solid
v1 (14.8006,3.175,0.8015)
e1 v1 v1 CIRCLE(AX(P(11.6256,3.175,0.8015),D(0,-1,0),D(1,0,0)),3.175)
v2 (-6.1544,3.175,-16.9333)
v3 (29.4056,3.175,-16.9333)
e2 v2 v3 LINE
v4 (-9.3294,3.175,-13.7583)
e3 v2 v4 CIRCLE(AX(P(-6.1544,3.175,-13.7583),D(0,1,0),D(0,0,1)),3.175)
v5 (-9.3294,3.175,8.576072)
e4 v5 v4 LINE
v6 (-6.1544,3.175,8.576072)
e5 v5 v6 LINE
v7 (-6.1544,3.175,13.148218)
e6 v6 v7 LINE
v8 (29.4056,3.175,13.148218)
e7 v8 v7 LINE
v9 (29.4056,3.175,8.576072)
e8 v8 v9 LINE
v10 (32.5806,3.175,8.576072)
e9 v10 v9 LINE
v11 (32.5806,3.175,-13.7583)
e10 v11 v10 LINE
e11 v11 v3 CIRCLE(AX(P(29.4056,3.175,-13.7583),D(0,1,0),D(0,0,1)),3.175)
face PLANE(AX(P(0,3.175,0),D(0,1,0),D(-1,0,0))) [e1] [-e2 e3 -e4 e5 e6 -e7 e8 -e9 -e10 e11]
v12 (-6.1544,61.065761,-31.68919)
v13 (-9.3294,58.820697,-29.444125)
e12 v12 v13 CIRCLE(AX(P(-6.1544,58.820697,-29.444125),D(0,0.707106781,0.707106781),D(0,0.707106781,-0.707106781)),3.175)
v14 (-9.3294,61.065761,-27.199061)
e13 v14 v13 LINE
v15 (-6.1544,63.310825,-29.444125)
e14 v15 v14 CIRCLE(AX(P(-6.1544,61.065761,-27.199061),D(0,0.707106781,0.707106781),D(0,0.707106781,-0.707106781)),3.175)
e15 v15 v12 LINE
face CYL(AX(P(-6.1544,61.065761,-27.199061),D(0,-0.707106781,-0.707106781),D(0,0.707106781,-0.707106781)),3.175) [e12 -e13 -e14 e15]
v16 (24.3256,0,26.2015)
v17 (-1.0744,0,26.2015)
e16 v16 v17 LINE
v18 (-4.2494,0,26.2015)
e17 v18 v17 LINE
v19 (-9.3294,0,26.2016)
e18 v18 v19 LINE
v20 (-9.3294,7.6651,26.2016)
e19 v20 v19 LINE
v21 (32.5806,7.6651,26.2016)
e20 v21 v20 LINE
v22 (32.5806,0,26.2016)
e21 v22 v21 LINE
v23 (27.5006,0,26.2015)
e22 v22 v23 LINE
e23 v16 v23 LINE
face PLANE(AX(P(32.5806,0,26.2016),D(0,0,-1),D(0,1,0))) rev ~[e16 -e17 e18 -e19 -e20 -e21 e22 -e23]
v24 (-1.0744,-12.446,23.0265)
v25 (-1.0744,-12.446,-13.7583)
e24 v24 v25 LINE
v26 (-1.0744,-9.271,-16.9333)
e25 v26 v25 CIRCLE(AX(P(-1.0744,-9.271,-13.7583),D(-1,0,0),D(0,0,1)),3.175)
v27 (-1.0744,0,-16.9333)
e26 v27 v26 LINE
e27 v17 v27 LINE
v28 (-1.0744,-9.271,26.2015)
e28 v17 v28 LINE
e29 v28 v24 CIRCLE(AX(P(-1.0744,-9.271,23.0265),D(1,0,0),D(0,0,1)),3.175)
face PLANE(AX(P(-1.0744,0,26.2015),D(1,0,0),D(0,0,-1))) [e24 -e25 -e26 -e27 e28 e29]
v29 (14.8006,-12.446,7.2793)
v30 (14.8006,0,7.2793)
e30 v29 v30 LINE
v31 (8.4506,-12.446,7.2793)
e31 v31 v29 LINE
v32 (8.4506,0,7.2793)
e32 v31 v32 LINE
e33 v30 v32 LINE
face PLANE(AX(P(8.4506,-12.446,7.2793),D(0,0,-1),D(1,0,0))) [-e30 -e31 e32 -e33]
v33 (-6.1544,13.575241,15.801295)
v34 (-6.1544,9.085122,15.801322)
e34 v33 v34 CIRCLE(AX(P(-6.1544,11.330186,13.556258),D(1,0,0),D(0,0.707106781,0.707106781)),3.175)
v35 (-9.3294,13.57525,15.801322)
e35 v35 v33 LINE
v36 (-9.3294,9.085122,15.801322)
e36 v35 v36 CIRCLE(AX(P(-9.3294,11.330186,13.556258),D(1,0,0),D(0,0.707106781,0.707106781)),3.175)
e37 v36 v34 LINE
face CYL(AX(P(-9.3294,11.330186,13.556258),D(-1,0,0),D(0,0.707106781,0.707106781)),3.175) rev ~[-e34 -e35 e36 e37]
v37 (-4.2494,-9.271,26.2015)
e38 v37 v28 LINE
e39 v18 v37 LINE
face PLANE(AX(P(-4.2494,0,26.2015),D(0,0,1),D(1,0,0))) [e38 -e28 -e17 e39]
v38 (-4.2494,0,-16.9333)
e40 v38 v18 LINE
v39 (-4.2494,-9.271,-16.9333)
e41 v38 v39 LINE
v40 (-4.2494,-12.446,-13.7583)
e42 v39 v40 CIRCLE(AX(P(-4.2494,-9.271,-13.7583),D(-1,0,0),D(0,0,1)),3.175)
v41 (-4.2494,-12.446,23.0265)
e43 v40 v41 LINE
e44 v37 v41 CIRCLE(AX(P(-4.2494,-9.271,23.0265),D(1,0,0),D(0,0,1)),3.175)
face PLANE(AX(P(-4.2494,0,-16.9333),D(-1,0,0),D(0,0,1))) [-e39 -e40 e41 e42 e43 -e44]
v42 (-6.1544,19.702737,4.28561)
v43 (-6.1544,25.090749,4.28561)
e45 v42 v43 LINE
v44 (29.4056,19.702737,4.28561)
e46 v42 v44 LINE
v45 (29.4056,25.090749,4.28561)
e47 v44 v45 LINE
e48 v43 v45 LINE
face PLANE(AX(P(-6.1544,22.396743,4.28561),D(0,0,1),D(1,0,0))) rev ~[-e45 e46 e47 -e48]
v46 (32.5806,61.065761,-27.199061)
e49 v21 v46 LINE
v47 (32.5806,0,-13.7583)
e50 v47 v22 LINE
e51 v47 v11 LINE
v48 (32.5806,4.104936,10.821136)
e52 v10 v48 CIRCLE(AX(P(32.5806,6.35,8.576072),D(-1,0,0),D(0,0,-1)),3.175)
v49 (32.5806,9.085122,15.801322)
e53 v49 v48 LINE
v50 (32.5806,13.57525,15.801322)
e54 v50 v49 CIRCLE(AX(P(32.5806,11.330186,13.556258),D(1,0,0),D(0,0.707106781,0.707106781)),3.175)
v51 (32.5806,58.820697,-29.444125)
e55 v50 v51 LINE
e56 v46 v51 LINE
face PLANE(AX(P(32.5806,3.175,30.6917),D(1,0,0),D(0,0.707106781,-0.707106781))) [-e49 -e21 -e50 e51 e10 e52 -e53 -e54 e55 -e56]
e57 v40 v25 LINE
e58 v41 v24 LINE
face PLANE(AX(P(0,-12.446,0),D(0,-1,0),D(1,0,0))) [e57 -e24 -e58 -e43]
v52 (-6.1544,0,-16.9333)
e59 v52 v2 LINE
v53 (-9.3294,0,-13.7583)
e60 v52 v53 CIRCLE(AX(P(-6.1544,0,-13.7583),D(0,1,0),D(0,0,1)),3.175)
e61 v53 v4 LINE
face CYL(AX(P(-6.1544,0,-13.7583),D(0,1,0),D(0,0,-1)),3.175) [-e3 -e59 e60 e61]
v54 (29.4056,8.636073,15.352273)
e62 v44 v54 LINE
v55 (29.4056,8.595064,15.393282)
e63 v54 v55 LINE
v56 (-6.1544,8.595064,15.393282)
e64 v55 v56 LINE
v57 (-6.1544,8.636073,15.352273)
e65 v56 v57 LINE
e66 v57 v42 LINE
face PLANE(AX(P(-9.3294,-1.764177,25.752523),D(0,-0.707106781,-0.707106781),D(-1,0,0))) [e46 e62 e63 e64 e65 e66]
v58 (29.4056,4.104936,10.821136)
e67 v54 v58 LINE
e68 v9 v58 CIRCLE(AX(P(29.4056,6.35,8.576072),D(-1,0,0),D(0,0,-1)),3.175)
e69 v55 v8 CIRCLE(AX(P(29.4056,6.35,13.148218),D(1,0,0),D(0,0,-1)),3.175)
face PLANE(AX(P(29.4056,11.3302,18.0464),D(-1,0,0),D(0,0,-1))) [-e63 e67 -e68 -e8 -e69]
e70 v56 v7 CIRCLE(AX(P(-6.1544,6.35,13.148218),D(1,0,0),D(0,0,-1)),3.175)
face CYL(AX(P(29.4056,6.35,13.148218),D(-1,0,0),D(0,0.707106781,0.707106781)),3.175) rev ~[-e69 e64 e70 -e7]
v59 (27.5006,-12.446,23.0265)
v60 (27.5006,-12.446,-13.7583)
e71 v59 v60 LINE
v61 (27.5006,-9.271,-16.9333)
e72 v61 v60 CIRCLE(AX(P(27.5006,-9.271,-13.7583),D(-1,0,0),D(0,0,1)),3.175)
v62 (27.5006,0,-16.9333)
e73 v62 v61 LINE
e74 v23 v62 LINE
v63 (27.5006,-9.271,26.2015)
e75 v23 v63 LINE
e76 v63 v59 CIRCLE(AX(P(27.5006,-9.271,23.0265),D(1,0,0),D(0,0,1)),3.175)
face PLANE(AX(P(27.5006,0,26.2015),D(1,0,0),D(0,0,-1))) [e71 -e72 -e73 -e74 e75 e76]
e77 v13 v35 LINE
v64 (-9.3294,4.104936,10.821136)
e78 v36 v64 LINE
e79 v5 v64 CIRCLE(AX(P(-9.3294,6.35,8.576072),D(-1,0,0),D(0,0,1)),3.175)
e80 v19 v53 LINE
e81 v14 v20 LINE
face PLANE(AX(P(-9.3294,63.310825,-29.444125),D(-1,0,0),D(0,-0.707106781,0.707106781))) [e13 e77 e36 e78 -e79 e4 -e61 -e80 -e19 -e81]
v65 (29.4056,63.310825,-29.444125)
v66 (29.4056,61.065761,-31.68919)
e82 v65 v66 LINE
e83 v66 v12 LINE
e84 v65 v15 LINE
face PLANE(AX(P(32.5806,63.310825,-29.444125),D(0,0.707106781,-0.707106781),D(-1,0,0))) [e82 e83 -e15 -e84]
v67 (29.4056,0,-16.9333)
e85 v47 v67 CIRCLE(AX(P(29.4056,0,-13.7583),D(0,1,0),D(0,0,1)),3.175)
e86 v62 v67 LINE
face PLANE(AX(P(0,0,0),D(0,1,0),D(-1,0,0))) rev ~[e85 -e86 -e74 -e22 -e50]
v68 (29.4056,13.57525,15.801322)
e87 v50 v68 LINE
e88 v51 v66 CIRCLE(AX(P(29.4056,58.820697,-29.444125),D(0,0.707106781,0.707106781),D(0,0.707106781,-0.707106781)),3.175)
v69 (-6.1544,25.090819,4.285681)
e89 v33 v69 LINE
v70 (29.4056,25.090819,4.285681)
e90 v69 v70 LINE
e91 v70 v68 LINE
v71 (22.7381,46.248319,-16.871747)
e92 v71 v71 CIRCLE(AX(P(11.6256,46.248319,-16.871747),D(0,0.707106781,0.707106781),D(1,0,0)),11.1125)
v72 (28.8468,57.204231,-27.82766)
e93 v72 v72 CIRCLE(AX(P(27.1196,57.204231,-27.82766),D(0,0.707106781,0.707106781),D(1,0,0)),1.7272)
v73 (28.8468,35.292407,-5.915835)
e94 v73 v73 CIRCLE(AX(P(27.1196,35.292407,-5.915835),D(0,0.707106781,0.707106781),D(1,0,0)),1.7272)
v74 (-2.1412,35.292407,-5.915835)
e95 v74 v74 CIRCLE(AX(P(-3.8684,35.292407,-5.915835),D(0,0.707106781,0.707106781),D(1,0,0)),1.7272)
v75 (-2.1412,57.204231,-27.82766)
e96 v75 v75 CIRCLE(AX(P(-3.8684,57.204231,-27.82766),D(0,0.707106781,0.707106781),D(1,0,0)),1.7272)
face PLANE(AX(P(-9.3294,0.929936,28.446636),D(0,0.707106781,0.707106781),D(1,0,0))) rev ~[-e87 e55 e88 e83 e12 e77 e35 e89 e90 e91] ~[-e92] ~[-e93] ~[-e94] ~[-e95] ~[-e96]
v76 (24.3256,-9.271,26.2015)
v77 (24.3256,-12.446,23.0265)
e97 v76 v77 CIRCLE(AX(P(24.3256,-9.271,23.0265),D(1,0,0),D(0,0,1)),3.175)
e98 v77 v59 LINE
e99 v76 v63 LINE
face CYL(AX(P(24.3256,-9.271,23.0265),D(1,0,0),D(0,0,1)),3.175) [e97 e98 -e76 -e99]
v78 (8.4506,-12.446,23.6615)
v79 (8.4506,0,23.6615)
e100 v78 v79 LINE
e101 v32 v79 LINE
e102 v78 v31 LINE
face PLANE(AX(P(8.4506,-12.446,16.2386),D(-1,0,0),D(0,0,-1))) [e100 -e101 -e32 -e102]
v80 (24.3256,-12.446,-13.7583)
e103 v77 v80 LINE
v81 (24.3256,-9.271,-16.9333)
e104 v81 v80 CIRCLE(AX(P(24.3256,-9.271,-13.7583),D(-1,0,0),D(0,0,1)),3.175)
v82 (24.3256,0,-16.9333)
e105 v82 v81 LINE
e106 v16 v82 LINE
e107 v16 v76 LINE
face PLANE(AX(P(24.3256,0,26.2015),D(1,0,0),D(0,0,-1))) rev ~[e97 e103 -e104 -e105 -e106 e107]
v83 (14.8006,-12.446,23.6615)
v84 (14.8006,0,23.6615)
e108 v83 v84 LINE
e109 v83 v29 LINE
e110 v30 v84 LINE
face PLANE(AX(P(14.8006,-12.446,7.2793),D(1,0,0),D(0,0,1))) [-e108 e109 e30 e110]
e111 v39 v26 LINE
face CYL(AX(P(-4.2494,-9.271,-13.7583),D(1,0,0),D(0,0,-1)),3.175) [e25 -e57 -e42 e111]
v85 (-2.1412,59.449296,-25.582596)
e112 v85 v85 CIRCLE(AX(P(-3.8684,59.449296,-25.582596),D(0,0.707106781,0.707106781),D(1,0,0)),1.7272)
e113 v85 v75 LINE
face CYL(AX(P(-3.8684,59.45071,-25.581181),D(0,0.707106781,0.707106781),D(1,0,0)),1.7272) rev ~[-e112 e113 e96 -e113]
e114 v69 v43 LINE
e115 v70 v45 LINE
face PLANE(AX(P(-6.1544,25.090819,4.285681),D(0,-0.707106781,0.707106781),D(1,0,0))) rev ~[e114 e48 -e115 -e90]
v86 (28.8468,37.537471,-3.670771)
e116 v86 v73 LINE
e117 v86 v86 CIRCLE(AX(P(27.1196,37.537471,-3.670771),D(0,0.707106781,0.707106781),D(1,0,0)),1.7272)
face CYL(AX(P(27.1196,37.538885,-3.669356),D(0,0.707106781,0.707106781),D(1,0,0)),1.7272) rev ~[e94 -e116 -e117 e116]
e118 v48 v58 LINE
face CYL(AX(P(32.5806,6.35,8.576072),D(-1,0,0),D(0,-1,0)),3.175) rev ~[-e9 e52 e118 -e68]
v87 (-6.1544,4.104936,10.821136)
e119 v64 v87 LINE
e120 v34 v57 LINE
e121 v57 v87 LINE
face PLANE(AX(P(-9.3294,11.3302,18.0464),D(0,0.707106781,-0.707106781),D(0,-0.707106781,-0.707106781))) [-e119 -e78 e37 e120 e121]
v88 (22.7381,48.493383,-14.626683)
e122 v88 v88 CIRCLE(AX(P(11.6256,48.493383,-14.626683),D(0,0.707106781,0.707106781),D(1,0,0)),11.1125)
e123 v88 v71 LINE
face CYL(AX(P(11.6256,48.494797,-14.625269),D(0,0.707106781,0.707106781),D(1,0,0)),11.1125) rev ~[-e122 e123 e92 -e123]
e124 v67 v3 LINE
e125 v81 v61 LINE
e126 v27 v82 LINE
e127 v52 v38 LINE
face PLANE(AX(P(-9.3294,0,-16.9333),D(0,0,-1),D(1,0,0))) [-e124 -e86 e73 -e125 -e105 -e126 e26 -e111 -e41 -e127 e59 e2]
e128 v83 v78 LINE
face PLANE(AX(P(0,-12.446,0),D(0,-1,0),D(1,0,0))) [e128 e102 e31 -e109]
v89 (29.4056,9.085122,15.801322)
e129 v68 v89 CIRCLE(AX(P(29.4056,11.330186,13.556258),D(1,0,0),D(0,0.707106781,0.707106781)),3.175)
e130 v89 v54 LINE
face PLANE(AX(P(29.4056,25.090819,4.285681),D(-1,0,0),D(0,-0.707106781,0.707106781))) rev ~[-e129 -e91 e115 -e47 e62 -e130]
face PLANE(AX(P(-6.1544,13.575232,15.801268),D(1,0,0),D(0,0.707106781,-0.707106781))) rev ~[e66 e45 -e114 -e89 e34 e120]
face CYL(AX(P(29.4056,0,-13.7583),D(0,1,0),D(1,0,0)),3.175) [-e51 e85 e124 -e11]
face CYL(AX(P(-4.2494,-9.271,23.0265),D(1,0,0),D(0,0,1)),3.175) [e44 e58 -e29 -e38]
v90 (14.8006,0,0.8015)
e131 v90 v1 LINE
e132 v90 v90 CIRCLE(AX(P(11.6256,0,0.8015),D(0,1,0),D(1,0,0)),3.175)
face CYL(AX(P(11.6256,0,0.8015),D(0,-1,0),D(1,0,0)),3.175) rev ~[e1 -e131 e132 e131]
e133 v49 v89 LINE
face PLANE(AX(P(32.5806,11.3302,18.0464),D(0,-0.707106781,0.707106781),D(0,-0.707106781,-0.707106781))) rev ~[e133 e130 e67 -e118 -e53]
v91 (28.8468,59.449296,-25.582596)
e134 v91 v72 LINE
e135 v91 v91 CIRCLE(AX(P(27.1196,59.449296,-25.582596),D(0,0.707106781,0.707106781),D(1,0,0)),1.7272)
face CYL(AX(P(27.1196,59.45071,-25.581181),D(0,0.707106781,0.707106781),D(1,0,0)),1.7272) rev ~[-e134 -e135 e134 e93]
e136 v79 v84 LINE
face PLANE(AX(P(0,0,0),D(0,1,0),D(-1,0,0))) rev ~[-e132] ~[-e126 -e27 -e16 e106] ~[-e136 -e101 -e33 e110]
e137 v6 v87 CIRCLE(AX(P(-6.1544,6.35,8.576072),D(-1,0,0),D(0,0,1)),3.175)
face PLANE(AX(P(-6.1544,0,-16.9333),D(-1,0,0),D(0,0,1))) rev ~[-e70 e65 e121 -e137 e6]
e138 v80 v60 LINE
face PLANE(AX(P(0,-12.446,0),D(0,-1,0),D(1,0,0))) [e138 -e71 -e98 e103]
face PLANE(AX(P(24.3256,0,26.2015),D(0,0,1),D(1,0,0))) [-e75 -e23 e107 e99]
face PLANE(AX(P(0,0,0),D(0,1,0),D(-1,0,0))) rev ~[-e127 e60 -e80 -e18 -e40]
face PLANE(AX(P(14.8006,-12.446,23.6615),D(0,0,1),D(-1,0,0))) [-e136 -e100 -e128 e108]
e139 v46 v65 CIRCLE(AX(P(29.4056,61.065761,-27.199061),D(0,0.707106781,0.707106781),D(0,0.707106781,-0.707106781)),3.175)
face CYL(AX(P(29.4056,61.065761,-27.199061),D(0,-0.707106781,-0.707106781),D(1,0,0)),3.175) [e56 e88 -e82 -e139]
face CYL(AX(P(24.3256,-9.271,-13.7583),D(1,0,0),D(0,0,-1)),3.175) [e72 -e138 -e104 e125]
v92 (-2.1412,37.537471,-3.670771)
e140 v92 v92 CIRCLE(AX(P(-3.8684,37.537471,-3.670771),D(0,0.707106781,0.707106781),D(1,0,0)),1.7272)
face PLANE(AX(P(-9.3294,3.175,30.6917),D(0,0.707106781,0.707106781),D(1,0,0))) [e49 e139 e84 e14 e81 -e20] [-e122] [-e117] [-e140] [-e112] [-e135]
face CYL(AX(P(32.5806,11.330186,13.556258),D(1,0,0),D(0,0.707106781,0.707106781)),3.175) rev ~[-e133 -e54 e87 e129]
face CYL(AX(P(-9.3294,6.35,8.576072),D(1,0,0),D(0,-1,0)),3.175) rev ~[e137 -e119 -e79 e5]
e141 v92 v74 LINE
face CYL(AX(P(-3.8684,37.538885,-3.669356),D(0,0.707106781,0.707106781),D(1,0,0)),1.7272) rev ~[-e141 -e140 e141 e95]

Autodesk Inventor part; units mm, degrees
ref_plane "YZ Plane" through (0, 0, 0) normal (1, 0, 0) x (0, 1, 0)
ref_plane "XZ Plane" through (0, 0, 0) normal (0, 1, 0) x (-1, 0, 0)
ref_plane "XY Plane" through (0, 0, 0) normal (0, 0, 1) x (1, 0, 0)
sketch "Sketch1" plane through (0, 0, 0) normal (0, 1, 0) x (-1, 0, 0)
  line L0 (9.3294, -16.9333) -> (-32.5806, -16.9333)
  line L1 (-32.5806, -16.9333) -> (-32.5806, 33.8667)
  line L2 (-32.5806, 33.8667) -> (9.3294, 33.8667)
  line L3 (9.3294, 33.8667) -> (9.3294, -16.9333)
  point P0 (0, 0)
  dimension "d0" = 50.8
  dimension "d1" = 41.91
extrude "Extrusion1" add sketch "Sketch1" along normal blind 3.175
chamfer "Chamfer1" distance 3.175 angle 45 1 edges at (11.6256, 3.175, 33.8667)
sketch "Sketch9" plane through (32.5806, 0, -16.9333) normal (1, 0, 0) x (0, 0, -1)
  line L0 (-47.625, 3.175) -> (0, 3.175) projected
  line L1 (-11.631, 34.6788) -> (-43.1349, 3.175) projected
  line L2 (-13.8761, 36.9239) -> (-11.631, 34.6788) projected
  line L3 (-34.9797, 11.3302) -> (-26.8245, 3.175)
  point P0 (-16.9333, 0)
  dimension "d15" = 33.02
extrude "Extrusion4" add sketch "Sketch9" against normal blind 3.175
sketch "Sketch10" plane through (-9.3294, 0, -16.9333) normal (-1, 0, 0) x (0, 0, 1)
  line L0 (0, 3.175) -> (47.625, 3.175) projected
  line L1 (13.8761, 36.9239) -> (11.631, 34.6788) projected
  line L2 (43.1349, 3.175) -> (11.631, 34.6788) projected
  line L3 (34.9797, 11.3302) -> (26.8245, 3.175)
  point P0 (16.9333, 0)
  dimension "d18" = 33.02
extrude "Extrusion5" add sketch "Sketch10" against normal blind 3.175
fillet "Fillet3" radius 3.175 2 edges at (-7.7419, 3.175, 9.8912) (30.9931, 3.175, 9.8912)
fillet "Fillet4" radius 3.175 2 edges at (-9.3294, 1.5875, -16.9333) (32.5806, 1.5875, -16.9333)
sketch "Sketch11" plane through (0, 0, 0) normal (0, -1, 0) x (1, 0, 0)
  line L0 (-9.3294, 26.2015) -> (32.5806, 26.2015) projected
  line L1 (-9.3294, 33.8667) -> (-9.3294, -13.7583) projected
  line L2 (-6.1544, -16.9333) -> (29.4056, -16.9333) projected
  line L3 (32.5806, -13.7583) -> (32.5806, 33.8667) projected
  line L4 (11.6256, 26.2015) -> (11.6256, -16.9333)
  line L5 (-9.3294, 0.8015) -> (32.5806, 0.8015)
  circle A0 centre (11.6256, 0.8015) radius 3.175
  point P0 (0, 0)
  dimension "d24" = 20.955
  dimension "d25" = 25.4
  dimension "d26" = 6.35
extrude "Extrusion9" cut sketch "Sketch11" against normal blind 12.446 contours A0 L5 L4 | L4 L5 A0 | L5 L4 A0 | L5 A0 L4
sketch "Sketch19" plane through (0, 0, 0) normal (0, -1, 0) x (1, 0, 0)
  circle A0 centre (11.6256, 0.8015) radius 3.175 projected
  circle A1 centre (11.6256, -9.3585) radius 3.175
  point P0 (0, 0)
  dimension "d44" = 6.35
  dimension "d45" = 10.16
  dimension "d46" = 0
extrude "Extrusion10" add sketch "Sketch19" along normal blind 12.446 contours A1
sketch "Sketch20" plane through (0, 0, 0) normal (0, -1, 0) x (1, 0, 0)
  circle A0 centre (11.6256, 0.8015) radius 3.175 projected
  circle A1 centre (11.6256, 10.9615) radius 3.175
  point P0 (0, 0)
  dimension "d49" = 6.35
  dimension "d50" = 10.16
  dimension "d51" = 0
extrude "Extrusion11" add sketch "Sketch20" along normal blind 12.446 contours A1
sketch "Sketch24" plane through (0, 0, 0) normal (0, -1, 0) x (1, 0, 0)
  circle A0 centre (11.6256, 0.8015) radius 3.175 projected
  line L0 (-9.3294, 26.2015) -> (32.5806, 26.2015) projected
  line L1 (-6.1544, -16.9333) -> (29.4056, -16.9333) projected
  line L2 (24.3256, 26.2015) -> (24.3256, -16.9333)
  line L3 (24.3256, 26.2015) -> (27.5006, 26.2015)
  line L4 (27.5006, 26.2015) -> (27.5006, -16.9333)
  line L5 (27.5006, -16.9333) -> (24.3256, -16.9333)
  line L6 (24.3256, -16.9333) -> (24.3256, 26.2015)
  point P0 (0, 0)
  dimension "d64" = 12.7
  dimension "d65" = 3.175
extrude "Extrusion14" add sketch "Sketch24" along normal blind 12.446 contours L0 L4 L1 L2
sketch "Sketch25" plane through (0, 0, 0) normal (0, -1, 0) x (1, 0, 0)
  circle A0 centre (11.6256, 0.8015) radius 3.175 projected
  line L0 (-9.3294, 26.2015) -> (24.3256, 26.2015) projected
  line L1 (-6.1544, -16.9333) -> (24.3256, -16.9333) projected
  line L2 (-1.0744, 26.2015) -> (-1.0744, -16.9333)
  line L3 (-1.0744, -16.9333) -> (-4.2494, -16.9333)
  line L4 (-4.2494, -16.9333) -> (-4.2494, 26.2015)
  line L5 (-4.2494, 26.2015) -> (-1.0744, 26.2015)
  line L6 (-1.0744, 26.2015) -> (-1.0744, -16.9333)
  point P0 (0, 0)
  dimension "d68" = 12.7
  dimension "d69" = 3.175
extrude "Extrusion15" add sketch "Sketch25" along normal blind 12.446 contours L0 L2 L1 L4
fillet "Fillet8" radius 3.175 4 edges at (25.9131, -12.446, 26.2015) (25.9131, -12.446, -16.9333) (-2.6619, -12.446, -16.9333) (-2.6619, -12.446, 26.2015)
sketch "Sketch28" plane through (-9.3294, 3.175, 30.6917) normal (0, 0.7071068, 0.7071068) x (1, 0, 0)
  line L0 (41.91, -4.4901) -> (41.91, 0) projected
  line L1 (41.91, 0) -> (0, 0) projected
  line L2 (0, 0) -> (0, -4.4901) projected
  line L3 (41.91, -4.4901) -> (0, -4.4901) projected
  line L4 (0, -4.4901) -> (41.91, -4.4901)
  line L5 (41.91, -4.4901) -> (41.91, 85.0449)
  line L6 (41.91, 85.0449) -> (0, 85.0449)
  line L7 (0, 85.0449) -> (0, -4.4901)
  point P0 (9.3294, 19.4572)
  dimension "d75" = 41.91
  dimension "d76" = 89.535
extrude "Extrusion16" add sketch "Sketch28" against normal blind 3.175 contours L1 L7 L6 L5
sketch "Sketch29" plane through (-9.3294, 0, 33.8667) normal (0, 0.7071068, 0.7071068) x (1, 0, 0)
  line L0 (41.91, 89.535) -> (0, 89.535) projected
  line L1 (0, 89.535) -> (0, 0) projected
  circle A0 centre (20.955, 68.58) radius 11.1125
  point P0 (9.3294, 23.9473)
  dimension "d79" = 22.225
  dimension "d80" = 20.955
  dimension "d81" = 20.955
extrude "Extrusion17" cut sketch "Sketch29" against normal blind 3.175
sketch "Sketch30" plane through (-9.3294, 0, 33.8667) normal (0, 0.7071068, 0.7071068) x (1, 0, 0)
  circle A0 centre (20.955, 68.58) radius 11.1125 projected
  circle A1 centre (5.461, 84.074) radius 1.7272
  point P0 (9.3294, 23.9473)
  dimension "d84" = 3.4544
  dimension "d85" = 15.494
  dimension "d86" = 15.494
extrude "Extrusion18" cut sketch "Sketch30" against normal blind 3.175 contours A1
sketch "Sketch31" plane through (-9.3294, 0, 33.8667) normal (0, 0.7071068, 0.7071068) x (1, 0, 0)
  circle A0 centre (5.461, 84.074) radius 1.7272 projected
  circle A1 centre (20.955, 68.58) radius 11.1125 projected
  circle A2 centre (5.461, 53.086) radius 1.7272
  point P0 (9.3294, 23.9473)
  dimension "d89" = 3.4544
  dimension "d90" = 3.4544
  dimension "d91" = 15.494
  dimension "d92" = 15.494
extrude "Extrusion19" cut sketch "Sketch31" against normal blind 3.175 contours A2
sketch "Sketch32" plane through (-9.3294, 0, 33.8667) normal (0, 0.7071068, 0.7071068) x (1, 0, 0)
  circle A0 centre (20.955, 68.58) radius 11.1125 projected
  circle A1 centre (36.449, 84.074) radius 1.7272
  point P0 (9.3294, 23.9473)
  dimension "d95" = 3.4544
  dimension "d96" = 15.494
  dimension "d97" = 15.494
extrude "Extrusion20" cut sketch "Sketch32" against normal blind 3.175 contours A1
sketch "Sketch33" plane through (-9.3294, 0, 33.8667) normal (0, 0.7071068, 0.7071068) x (1, 0, 0)
  circle A0 centre (20.955, 68.58) radius 11.1125 projected
  circle A1 centre (36.449, 53.086) radius 1.7272
  point P0 (9.3294, 23.9473)
  dimension "d100" = 3.4544
  dimension "d101" = 15.494
  dimension "d102" = 15.494
extrude "Extrusion21" cut sketch "Sketch33" against normal blind 3.175 contours A1
fillet "Fillet9" radius 3.175 2 edges at (-9.3294, 62.1883, -30.5667) (32.5806, 62.1883, -30.5667)
fillet "Fillet10" radius 3.175 2 edges at (30.9931, 11.3302, 18.0464) (-7.7419, 11.3302, 18.0464)
sketch "Sketch37" plane through (11.6256, -12.446, 10.9615) normal (0, -1, 0) x (1, 0, 0)
  line L0 (-15.875, 12.065) -> (-15.875, -24.7199) projected
  line L1 (-12.7, -24.7199) -> (-12.7, 12.065) projected
  circle A0 centre (0, 0) radius 3.175 projected
  line L2 (-3.175, 0) -> (3.175, 0)
  line L3 (3.175, 0) -> (3.175, 12.7)
  line L4 (3.175, 12.7) -> (-3.175, 12.7)
  line L5 (-3.175, 12.7) -> (-3.175, 0)
  point P0 (-11.6256, -10.9615)
  dimension "d111" = 3.175
  dimension "d112" = 6.35
  dimension "d113" = 12.7
extrude "Extrusion22" add sketch "Sketch37" against normal blind 12.954 contours L2 A0 | A0 L5 L4 L3 picked at (0.7922, 0.7018)
sketch "Sketch38" plane through (0, -12.446, 0) normal (0, -1, 0) x (1, 0, 0)
  line L0 (14.8006, 10.9615) -> (14.8006, 23.6615) projected
  line L1 (14.8006, 16.2386) -> (8.4506, 16.2386)
  line L2 (8.4506, 16.2386) -> (8.4506, 7.2793)
  line L3 (8.4506, 7.2793) -> (14.8006, 7.2793)
  line L4 (14.8006, 7.2793) -> (14.8006, 16.2386)
  point P0 (0, 0)
  dimension "d116" = 6.35
extrude "Extrusion23" add sketch "Sketch38" against normal blind 12.954
sketch "Sketch39" plane through (11.6256, -12.446, -9.3585) normal (0, -1, 0) x (1, 0, 0)
  line L0 (3.175, -3.175) -> (-3.175, -3.175)
  line L1 (-3.175, -3.175) -> (-3.175, 3.175)
  line L2 (-3.175, 3.175) -> (3.175, 3.175)
  line L3 (3.175, 3.175) -> (3.175, -3.175)
  point P0 (-11.6256, 9.3585)
  dimension "d119" = 6.35
  dimension "d120" = 6.35
extrude "Extrusion24" add sketch "Sketch39" against normal blind 12.954
fillet "Fillet12" radius 3.175 1 edges at (14.8006, -6.223, -12.5335)
fillet "Fillet13" radius 3.175 1 edges at (8.4506, -6.223, -12.5335)
sketch "Sketch44" plane through (32.5806, 0, 33.8667) normal (1, 0, 0) x (0, 0, -1)
  line L0 (7.6651, 0) -> (7.6651, 7.6651)
  line L1 (61.0657, 61.0657) -> (0, 0) projected
  line L2 (0, 0) -> (7.6651, 0)
  line L3 (47.625, 0) -> (0, 0) projected
  line L4 (7.6651, 7.6651) -> (0, 0)
  point P0 (33.8667, 0)
extrude "Extrusion25" cut sketch "Sketch44" against normal blind 76.2
sketch "Sketch45" plane through (-9.3294, 0.9299, 28.4466) normal (0, -0.7071068, -0.7071068) x (-1, 0, 0)
  line L0 (-38.735, 3.175) -> (-3.175, 3.175)
  line L1 (-3.175, 3.175) -> (-3.175, 34.1687)
  line L2 (-3.175, 34.1687) -> (-38.735, 34.1687)
  line L3 (-38.735, 34.1687) -> (-38.735, 3.175)
  line L4 (-3.175, 3.175) -> (-3.175, 17.8832) projected
  circle A0 centre (-36.449, 48.5959) radius 1.7272 projected
  point P0 (-9.3294, 19.4572)
  dimension "d129" = 0
  dimension "d130" = 12.7
extrude "Extrusion26" add sketch "Sketch45" along normal blind 3.81 contours L3 L2 L1 L0
chamfer "Chamfer2" distance 3.81 angle 45 1 edges at (11.6256, 22.3968, 1.5916)
fillet "Fillet14" radius 3.175 1 edges at (11.6256, 3.175, 20.8134)
sketch "Sketch47" plane through (0, -12.446, 0) normal (0, -1, 0) x (1, 0, 0)
  line L0 (14.8006, -6.1835) -> (8.4506, -6.1835)
  line L1 (8.4506, -6.1835) -> (8.4506, -12.6132)
  line L2 (8.4506, -12.6132) -> (14.8006, -12.6132)
  line L3 (14.8006, -12.6132) -> (14.8006, -6.1835)
  point P0 (0, 0)
extrude "Extrusion27" cut sketch "Sketch47" against normal blind 12.446
properties part number "slider"
